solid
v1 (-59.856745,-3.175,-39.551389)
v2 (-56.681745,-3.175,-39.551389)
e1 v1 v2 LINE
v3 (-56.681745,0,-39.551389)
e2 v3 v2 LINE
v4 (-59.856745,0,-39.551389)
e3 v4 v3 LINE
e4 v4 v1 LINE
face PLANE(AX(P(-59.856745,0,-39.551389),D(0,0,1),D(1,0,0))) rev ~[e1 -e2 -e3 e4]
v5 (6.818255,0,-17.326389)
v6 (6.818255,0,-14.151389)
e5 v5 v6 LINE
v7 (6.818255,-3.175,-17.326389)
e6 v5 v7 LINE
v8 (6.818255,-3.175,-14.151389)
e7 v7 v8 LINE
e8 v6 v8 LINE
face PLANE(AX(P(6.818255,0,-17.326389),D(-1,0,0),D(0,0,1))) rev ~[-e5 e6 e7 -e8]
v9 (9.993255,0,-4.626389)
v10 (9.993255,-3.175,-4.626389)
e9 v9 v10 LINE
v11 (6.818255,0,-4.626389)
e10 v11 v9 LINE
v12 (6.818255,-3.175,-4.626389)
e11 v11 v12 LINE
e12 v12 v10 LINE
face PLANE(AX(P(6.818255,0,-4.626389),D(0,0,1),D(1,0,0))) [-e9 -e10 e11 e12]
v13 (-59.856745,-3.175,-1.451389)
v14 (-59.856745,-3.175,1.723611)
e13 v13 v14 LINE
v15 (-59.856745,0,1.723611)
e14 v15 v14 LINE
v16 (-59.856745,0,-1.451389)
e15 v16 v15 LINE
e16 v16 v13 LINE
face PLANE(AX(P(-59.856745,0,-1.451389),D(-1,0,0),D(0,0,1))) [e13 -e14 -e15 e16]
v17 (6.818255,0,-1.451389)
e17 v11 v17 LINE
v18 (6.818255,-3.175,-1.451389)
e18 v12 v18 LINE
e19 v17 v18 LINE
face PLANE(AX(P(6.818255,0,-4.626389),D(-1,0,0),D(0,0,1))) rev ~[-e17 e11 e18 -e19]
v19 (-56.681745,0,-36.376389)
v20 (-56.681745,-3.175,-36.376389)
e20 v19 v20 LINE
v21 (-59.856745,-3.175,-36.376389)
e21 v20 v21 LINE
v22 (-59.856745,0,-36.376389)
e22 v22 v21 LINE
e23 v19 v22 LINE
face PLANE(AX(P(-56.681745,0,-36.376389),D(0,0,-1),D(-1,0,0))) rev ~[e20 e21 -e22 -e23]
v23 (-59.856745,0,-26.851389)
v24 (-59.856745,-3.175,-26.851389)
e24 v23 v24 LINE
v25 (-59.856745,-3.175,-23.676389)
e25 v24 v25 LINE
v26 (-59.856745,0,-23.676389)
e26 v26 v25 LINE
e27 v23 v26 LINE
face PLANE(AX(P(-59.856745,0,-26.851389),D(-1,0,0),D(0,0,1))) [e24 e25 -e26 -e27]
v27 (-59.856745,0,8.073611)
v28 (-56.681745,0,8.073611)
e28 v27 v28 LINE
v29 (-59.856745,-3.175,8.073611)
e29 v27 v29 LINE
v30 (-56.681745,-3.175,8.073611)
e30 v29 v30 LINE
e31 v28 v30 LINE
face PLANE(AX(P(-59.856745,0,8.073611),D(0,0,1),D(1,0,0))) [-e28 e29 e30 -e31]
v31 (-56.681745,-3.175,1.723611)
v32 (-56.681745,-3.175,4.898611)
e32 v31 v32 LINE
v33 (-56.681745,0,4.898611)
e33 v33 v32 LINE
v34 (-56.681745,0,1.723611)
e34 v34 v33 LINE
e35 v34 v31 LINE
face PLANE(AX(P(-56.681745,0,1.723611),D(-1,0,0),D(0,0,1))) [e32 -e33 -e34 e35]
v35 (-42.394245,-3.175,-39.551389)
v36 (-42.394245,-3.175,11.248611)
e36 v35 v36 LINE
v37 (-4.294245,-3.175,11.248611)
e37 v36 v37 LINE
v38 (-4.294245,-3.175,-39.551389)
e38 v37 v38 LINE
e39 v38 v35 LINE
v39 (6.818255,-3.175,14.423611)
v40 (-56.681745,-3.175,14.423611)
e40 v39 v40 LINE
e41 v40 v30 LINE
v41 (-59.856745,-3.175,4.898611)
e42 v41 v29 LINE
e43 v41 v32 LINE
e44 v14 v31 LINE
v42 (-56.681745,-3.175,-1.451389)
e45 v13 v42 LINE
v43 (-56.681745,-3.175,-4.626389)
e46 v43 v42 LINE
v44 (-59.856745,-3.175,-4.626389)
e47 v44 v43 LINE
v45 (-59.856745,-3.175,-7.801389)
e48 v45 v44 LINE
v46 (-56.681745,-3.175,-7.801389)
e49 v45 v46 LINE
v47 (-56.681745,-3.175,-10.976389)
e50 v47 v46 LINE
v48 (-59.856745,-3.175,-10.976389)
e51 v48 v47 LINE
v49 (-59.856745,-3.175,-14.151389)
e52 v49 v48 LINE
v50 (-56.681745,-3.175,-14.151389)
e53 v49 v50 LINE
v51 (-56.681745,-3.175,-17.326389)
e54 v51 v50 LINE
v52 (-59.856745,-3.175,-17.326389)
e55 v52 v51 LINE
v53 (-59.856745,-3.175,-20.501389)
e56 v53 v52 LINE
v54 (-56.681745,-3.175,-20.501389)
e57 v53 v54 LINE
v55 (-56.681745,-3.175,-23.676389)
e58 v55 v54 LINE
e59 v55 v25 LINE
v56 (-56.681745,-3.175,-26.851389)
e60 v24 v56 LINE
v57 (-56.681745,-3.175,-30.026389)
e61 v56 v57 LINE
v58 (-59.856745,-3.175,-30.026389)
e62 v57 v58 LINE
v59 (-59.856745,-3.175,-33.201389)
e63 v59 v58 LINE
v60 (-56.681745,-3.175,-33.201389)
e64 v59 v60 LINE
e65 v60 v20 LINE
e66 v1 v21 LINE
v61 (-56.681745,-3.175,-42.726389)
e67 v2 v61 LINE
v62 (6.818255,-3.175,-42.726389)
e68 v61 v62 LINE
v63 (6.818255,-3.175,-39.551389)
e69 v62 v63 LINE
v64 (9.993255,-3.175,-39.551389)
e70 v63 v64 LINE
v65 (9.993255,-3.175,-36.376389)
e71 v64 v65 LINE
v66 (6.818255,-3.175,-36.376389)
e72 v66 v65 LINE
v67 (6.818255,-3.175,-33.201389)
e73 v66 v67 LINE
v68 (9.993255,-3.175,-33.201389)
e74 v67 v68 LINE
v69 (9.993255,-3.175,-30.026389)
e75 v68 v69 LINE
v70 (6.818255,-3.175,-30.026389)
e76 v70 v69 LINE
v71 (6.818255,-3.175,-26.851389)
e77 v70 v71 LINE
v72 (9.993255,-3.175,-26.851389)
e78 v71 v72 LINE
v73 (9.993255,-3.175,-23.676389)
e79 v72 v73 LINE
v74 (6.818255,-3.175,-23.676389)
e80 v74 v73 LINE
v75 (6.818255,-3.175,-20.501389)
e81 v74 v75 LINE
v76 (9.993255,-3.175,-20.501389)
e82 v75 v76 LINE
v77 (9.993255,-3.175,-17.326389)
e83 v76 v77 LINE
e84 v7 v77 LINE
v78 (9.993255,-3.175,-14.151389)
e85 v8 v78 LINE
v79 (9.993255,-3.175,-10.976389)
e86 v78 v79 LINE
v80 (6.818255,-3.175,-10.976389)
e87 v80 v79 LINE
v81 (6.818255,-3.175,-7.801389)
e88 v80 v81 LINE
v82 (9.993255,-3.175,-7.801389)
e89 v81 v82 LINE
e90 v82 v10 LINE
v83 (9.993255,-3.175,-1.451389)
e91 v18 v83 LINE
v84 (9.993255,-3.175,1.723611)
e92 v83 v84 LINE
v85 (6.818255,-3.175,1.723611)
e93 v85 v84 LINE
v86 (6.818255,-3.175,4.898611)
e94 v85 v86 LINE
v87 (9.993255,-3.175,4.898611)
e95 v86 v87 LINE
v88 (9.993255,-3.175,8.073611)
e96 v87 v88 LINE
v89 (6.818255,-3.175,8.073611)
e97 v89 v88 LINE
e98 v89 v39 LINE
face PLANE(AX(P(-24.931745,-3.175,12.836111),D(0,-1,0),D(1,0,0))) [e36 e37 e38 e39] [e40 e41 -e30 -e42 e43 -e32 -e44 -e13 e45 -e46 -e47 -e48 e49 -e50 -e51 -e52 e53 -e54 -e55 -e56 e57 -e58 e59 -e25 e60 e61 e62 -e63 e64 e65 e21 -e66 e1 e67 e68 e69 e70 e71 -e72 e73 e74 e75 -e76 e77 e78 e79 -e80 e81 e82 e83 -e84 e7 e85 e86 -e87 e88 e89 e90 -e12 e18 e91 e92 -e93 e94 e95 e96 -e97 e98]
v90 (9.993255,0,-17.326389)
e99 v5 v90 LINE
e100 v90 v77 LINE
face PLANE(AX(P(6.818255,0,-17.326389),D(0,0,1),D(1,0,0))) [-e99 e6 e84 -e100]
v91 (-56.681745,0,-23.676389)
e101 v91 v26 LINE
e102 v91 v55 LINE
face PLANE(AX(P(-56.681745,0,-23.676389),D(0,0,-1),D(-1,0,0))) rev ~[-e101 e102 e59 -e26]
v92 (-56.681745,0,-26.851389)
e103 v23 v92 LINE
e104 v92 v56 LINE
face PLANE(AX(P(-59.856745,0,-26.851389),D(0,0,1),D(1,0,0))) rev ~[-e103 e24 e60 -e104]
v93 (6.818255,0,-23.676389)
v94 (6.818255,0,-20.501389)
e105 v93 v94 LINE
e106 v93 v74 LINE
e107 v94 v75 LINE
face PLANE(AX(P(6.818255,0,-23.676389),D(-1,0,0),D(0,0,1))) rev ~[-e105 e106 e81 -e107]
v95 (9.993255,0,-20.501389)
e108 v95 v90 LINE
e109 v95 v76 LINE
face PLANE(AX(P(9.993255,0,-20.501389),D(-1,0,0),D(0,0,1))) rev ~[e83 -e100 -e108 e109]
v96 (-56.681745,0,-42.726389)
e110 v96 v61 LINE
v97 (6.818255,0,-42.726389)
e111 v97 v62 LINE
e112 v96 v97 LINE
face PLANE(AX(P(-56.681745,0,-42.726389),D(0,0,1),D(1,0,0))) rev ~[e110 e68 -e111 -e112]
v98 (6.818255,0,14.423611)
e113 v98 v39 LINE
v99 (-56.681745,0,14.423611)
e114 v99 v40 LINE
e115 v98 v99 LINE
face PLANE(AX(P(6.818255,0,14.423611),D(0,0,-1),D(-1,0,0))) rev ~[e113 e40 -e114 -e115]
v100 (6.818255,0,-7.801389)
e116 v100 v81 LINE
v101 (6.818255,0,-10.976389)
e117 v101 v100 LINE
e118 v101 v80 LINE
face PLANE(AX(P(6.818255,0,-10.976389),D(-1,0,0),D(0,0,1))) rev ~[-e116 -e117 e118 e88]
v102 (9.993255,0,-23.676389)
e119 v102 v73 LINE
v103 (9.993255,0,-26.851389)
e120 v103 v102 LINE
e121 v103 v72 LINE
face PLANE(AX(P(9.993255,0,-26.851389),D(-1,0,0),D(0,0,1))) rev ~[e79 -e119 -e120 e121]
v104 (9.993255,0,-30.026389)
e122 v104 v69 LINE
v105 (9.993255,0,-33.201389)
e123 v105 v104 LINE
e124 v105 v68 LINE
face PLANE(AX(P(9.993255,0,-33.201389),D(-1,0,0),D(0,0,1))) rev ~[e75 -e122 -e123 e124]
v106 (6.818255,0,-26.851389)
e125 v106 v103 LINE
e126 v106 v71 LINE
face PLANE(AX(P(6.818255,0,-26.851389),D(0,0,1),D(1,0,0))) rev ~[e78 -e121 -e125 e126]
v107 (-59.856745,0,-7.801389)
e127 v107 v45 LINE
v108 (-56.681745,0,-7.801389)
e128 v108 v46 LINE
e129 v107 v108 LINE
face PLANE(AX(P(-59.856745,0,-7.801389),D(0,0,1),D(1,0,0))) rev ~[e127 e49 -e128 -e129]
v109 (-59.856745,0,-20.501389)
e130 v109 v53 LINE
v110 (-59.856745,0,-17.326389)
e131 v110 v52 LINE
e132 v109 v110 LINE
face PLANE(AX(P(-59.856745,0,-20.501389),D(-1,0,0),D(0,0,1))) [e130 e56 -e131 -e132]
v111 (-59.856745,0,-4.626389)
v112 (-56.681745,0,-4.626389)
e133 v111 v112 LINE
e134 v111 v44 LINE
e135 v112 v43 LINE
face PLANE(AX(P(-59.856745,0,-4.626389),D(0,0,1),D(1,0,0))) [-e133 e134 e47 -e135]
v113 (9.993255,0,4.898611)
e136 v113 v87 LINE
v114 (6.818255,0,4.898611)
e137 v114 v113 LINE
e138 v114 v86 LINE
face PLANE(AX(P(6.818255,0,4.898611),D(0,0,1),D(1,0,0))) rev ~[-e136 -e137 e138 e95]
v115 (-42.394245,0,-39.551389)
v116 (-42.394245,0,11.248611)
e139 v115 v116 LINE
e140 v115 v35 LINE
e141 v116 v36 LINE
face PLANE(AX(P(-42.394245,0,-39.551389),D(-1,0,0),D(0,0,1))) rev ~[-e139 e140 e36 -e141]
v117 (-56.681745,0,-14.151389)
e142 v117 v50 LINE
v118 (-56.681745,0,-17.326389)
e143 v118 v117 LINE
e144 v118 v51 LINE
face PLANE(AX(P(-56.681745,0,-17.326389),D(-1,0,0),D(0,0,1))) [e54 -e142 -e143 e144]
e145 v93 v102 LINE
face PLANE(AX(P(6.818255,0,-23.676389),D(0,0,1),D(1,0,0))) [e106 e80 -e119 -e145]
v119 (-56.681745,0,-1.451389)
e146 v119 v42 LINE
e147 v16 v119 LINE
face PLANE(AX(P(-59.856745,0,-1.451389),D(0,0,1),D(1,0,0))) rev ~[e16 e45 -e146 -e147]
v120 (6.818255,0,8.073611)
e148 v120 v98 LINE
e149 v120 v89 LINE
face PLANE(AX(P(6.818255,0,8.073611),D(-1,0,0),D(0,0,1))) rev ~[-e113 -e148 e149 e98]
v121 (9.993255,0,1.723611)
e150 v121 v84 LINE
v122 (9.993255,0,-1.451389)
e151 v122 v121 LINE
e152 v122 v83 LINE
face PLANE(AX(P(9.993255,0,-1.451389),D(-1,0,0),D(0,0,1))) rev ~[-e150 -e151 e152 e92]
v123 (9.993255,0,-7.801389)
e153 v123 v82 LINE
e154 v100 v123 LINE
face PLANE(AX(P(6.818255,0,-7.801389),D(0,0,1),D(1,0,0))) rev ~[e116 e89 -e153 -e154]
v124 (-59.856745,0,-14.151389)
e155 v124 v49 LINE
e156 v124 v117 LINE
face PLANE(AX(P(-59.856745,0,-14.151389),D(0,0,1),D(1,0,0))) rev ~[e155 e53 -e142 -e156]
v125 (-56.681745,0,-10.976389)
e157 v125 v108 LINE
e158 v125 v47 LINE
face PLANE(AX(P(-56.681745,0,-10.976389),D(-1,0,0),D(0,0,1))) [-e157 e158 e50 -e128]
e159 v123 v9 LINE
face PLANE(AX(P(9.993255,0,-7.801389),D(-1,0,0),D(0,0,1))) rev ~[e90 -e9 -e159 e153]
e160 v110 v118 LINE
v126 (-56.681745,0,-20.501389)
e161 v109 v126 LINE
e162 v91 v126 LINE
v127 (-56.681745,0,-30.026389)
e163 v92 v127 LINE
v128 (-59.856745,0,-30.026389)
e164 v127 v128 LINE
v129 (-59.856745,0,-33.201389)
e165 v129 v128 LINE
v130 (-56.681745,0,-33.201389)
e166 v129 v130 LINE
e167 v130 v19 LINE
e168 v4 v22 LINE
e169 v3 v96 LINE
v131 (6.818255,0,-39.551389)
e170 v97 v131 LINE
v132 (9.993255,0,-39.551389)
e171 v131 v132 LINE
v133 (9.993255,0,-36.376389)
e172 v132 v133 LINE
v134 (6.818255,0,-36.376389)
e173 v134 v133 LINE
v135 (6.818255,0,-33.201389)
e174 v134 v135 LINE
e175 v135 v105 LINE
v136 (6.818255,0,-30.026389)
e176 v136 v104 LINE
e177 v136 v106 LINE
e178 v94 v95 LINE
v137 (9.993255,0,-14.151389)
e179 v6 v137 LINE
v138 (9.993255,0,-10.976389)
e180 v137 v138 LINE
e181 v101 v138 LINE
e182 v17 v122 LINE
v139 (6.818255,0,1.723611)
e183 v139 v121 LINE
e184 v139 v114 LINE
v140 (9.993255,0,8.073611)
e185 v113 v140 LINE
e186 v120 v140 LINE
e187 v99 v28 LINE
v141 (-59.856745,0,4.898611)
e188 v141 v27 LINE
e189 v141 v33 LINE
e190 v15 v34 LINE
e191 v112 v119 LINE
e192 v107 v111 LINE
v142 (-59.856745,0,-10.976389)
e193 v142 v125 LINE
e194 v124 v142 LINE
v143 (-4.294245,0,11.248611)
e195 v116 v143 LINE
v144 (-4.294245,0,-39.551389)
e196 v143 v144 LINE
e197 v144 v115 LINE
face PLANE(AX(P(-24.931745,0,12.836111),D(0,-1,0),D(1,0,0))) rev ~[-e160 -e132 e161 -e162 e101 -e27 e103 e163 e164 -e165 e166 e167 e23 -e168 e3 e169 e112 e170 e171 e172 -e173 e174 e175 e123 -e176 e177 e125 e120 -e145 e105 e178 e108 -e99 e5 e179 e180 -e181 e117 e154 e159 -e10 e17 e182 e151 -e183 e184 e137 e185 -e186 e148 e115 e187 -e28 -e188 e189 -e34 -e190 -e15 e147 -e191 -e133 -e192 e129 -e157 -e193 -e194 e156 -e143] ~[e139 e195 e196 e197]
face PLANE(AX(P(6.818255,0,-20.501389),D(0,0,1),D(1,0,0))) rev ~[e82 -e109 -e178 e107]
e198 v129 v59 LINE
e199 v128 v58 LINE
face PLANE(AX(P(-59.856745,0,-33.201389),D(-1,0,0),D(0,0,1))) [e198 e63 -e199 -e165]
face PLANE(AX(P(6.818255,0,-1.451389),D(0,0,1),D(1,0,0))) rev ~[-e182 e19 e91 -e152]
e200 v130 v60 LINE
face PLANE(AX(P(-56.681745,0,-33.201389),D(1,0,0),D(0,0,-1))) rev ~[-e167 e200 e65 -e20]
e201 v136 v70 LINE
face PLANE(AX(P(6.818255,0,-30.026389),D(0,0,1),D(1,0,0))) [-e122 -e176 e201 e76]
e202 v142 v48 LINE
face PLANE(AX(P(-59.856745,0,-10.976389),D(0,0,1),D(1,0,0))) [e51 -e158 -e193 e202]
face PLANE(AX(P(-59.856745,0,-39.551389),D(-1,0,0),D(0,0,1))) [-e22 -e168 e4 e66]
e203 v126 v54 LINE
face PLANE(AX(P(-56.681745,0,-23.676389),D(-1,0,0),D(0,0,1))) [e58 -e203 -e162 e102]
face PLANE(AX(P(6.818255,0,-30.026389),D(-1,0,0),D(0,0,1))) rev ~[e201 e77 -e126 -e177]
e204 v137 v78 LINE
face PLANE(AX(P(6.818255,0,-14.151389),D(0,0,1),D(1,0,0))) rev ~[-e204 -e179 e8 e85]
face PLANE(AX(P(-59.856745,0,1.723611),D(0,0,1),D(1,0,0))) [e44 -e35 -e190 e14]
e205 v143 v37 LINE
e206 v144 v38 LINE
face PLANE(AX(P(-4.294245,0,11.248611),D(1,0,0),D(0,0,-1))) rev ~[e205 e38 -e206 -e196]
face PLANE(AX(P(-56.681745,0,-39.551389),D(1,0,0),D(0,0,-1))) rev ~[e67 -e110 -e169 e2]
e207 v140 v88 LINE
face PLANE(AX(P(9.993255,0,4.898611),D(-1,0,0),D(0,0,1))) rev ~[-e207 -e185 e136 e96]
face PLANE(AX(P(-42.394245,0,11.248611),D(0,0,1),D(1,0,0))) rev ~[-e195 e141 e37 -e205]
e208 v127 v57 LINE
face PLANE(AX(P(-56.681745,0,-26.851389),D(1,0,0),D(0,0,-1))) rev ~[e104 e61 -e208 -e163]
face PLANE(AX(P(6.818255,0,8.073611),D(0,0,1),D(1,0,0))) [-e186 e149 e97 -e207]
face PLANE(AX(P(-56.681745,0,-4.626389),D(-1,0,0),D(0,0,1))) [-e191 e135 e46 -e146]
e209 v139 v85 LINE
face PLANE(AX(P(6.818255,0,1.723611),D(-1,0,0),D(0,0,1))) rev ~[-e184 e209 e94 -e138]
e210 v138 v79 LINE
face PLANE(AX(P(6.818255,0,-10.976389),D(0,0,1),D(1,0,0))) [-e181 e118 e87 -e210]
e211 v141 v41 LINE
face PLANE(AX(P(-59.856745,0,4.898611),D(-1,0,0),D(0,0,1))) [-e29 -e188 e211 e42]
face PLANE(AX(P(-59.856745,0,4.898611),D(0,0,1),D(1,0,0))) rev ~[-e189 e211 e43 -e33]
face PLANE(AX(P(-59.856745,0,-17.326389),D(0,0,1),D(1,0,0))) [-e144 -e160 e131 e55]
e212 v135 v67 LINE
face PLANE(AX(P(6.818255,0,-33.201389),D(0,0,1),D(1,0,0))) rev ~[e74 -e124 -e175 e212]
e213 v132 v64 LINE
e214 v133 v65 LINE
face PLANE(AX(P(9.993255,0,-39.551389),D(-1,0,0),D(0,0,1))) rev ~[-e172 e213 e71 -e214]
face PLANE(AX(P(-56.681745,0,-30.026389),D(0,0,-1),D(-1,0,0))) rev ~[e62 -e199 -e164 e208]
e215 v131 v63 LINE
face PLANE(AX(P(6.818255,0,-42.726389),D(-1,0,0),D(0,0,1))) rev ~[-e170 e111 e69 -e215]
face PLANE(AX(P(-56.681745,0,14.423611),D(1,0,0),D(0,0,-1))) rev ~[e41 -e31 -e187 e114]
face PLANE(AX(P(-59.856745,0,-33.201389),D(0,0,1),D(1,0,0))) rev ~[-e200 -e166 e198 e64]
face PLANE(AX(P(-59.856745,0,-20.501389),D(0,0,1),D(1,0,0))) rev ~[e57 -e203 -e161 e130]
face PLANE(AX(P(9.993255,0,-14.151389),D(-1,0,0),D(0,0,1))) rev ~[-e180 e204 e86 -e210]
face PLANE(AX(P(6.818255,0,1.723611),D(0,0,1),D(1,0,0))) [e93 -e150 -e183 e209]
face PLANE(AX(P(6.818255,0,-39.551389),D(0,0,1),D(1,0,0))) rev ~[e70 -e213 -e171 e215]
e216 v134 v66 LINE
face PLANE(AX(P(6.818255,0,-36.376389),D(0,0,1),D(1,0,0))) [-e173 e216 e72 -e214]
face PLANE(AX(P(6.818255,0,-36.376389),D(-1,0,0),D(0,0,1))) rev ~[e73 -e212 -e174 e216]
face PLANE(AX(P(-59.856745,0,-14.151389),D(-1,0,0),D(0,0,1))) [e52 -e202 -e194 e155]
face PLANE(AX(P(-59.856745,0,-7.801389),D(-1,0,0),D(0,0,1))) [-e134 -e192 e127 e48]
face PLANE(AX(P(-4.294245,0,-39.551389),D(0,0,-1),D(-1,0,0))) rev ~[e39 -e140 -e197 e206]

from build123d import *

# Parameters (mm, degrees)
F0_W     = 3.175
F0_H     = 3.175
F1_DEPTH = 3.175


# Not quite as in the source:
# - a feature names something its author has since deleted; it is built from what else it names


with BuildPart() as f1:
    # F0 (on Front) → F1 (new body)
    with BuildSketch(Plane.XZ):
        Polygon((-56.6817452915, 14.4236114298), (-56.6817452915, 11.2486114298), (-53.5067452915, 11.2486114298), (-42.3942452915, 11.2486114298), (-23.3442452915, 11.2486114298), (-4.2942452915, 11.2486114298), (6.8182547085, 11.2486114298), (6.8182547085, 14.4236114298), align=None)
        with Locations((-55.0942452915, 9.6611114298)):
            Rectangle(F0_W, F0_H)
        with Locations((-58.2692452915, 6.4861114298)):
            Rectangle(F0_W, F0_H)
        Polygon((-42.3942452915, 11.2486114298), (-53.5067452915, 11.2486114298), (-53.5067452915, 8.0736114298), (-53.5067452915, 4.8986114298), (-53.5067452915, 1.7236114298), (-53.5067452915, -1.4513885702), (-53.5067452915, -4.6263885702), (-53.5067452915, -7.8013885702), (-53.5067452915, -10.9763885702), (-53.5067452915, -14.1513885702), (-53.5067452915, -17.3263885702), (-53.5067452915, -20.5013885702), (-53.5067452915, -23.6763885702), (-53.5067452915, -26.8513885702), (-53.5067452915, -30.0263885702), (-53.5067452915, -33.2013885702), (-53.5067452915, -36.3763885702), (-53.5067452915, -39.5513885702), (-42.3942452915, -39.5513885702), align=None)
        with Locations((-55.0942452915, 6.4861114298)):
            Rectangle(F0_W, F0_H)
        with Locations((-55.0942452915, 3.3111114298)):
            Rectangle(F0_W, F0_H)
        with Locations((-58.2692452915, 0.1361114298)):
            Rectangle(F0_W, F0_H)
        Polygon((-23.3442452915, -39.5513885702), (-42.3942452915, -39.5513885702), (-53.5067452915, -39.5513885702), (-53.5067452915, -42.7263885702), (6.8182547085, -42.7263885702), (6.8182547085, -39.5513885702), (-4.2942452915, -39.5513885702), align=None)
        Polygon((6.8182547085, 8.0736114298), (6.8182547085, 11.2486114298), (-4.2942452915, 11.2486114298), (-4.2942452915, -39.5513885702), (6.8182547085, -39.5513885702), (6.8182547085, -36.3763885702), (6.8182547085, -33.2013885702), (6.8182547085, -30.0263885702), (6.8182547085, -26.8513885702), (6.8182547085, -23.6763885702), (6.8182547085, -20.5013885702), (6.8182547085, -17.3263885702), (6.8182547085, -14.1513885702), (6.8182547085, -10.9763885702), (6.8182547085, -7.8013885702), (6.8182547085, -4.6263885702), (6.8182547085, -1.4513885702), (6.8182547085, 1.7236114298), (6.8182547085, 4.8986114298), align=None)
        with Locations((-55.0942452915, 0.1361114298)):
            Rectangle(F0_W, F0_H)
        with Locations((-55.0942452915, -41.1388885702)):
            Rectangle(F0_W, F0_H)
        with Locations((-55.0942452915, -37.9638885702)):
            Rectangle(F0_W, F0_H)
        with Locations((8.4057547085, 6.4861114298)):
            Rectangle(F0_W, F0_H)
        with Locations((-55.0942452915, -3.0388885702)):
            Rectangle(F0_W, F0_H)
        with Locations((-58.2692452915, -6.2138885702)):
            Rectangle(F0_W, F0_H)
        with Locations((-58.2692452915, -37.9638885702)):
            Rectangle(F0_W, F0_H)
        with Locations((-55.0942452915, -34.7888885702)):
            Rectangle(F0_W, F0_H)
        with Locations((-55.0942452915, -6.2138885702)):
            Rectangle(F0_W, F0_H)
        with Locations((8.4057547085, -37.9638885702)):
            Rectangle(F0_W, F0_H)
        with Locations((-55.0942452915, -31.6138885702)):
            Rectangle(F0_W, F0_H)
        with Locations((8.4057547085, 0.1361114298)):
            Rectangle(F0_W, F0_H)
        with Locations((-55.0942452915, -9.3888885702)):
            Rectangle(F0_W, F0_H)
        with Locations((-58.2692452915, -12.5638885702)):
            Rectangle(F0_W, F0_H)
        with Locations((-58.2692452915, -31.6138885702)):
            Rectangle(F0_W, F0_H)
        with Locations((-55.0942452915, -28.4388885702)):
            Rectangle(F0_W, F0_H)
        with Locations((-55.0942452915, -12.5638885702)):
            Rectangle(F0_W, F0_H)
        with Locations((8.4057547085, -31.6138885702)):
            Rectangle(F0_W, F0_H)
        with Locations((-55.0942452915, -25.2638885702)):
            Rectangle(F0_W, F0_H)
        with Locations((8.4057547085, -6.2138885702)):
            Rectangle(F0_W, F0_H)
        with Locations((-55.0942452915, -15.7388885702)):
            Rectangle(F0_W, F0_H)
        with Locations((-58.2692452915, -18.9138885702)):
            Rectangle(F0_W, F0_H)
        with Locations((-58.2692452915, -25.2638885702)):
            Rectangle(F0_W, F0_H)
        with Locations((-55.0942452915, -22.0888885702)):
            Rectangle(F0_W, F0_H)
        with Locations((-55.0942452915, -18.9138885702)):
            Rectangle(F0_W, F0_H)
        with Locations((8.4057547085, -25.2638885702)):
            Rectangle(F0_W, F0_H)
        with Locations((8.4057547085, -12.5638885702)):
            Rectangle(F0_W, F0_H)
        with Locations((8.4057547085, -18.9138885702)):
            Rectangle(F0_W, F0_H)
    extrude(amount=F1_DEPTH)


solid = f1.part
